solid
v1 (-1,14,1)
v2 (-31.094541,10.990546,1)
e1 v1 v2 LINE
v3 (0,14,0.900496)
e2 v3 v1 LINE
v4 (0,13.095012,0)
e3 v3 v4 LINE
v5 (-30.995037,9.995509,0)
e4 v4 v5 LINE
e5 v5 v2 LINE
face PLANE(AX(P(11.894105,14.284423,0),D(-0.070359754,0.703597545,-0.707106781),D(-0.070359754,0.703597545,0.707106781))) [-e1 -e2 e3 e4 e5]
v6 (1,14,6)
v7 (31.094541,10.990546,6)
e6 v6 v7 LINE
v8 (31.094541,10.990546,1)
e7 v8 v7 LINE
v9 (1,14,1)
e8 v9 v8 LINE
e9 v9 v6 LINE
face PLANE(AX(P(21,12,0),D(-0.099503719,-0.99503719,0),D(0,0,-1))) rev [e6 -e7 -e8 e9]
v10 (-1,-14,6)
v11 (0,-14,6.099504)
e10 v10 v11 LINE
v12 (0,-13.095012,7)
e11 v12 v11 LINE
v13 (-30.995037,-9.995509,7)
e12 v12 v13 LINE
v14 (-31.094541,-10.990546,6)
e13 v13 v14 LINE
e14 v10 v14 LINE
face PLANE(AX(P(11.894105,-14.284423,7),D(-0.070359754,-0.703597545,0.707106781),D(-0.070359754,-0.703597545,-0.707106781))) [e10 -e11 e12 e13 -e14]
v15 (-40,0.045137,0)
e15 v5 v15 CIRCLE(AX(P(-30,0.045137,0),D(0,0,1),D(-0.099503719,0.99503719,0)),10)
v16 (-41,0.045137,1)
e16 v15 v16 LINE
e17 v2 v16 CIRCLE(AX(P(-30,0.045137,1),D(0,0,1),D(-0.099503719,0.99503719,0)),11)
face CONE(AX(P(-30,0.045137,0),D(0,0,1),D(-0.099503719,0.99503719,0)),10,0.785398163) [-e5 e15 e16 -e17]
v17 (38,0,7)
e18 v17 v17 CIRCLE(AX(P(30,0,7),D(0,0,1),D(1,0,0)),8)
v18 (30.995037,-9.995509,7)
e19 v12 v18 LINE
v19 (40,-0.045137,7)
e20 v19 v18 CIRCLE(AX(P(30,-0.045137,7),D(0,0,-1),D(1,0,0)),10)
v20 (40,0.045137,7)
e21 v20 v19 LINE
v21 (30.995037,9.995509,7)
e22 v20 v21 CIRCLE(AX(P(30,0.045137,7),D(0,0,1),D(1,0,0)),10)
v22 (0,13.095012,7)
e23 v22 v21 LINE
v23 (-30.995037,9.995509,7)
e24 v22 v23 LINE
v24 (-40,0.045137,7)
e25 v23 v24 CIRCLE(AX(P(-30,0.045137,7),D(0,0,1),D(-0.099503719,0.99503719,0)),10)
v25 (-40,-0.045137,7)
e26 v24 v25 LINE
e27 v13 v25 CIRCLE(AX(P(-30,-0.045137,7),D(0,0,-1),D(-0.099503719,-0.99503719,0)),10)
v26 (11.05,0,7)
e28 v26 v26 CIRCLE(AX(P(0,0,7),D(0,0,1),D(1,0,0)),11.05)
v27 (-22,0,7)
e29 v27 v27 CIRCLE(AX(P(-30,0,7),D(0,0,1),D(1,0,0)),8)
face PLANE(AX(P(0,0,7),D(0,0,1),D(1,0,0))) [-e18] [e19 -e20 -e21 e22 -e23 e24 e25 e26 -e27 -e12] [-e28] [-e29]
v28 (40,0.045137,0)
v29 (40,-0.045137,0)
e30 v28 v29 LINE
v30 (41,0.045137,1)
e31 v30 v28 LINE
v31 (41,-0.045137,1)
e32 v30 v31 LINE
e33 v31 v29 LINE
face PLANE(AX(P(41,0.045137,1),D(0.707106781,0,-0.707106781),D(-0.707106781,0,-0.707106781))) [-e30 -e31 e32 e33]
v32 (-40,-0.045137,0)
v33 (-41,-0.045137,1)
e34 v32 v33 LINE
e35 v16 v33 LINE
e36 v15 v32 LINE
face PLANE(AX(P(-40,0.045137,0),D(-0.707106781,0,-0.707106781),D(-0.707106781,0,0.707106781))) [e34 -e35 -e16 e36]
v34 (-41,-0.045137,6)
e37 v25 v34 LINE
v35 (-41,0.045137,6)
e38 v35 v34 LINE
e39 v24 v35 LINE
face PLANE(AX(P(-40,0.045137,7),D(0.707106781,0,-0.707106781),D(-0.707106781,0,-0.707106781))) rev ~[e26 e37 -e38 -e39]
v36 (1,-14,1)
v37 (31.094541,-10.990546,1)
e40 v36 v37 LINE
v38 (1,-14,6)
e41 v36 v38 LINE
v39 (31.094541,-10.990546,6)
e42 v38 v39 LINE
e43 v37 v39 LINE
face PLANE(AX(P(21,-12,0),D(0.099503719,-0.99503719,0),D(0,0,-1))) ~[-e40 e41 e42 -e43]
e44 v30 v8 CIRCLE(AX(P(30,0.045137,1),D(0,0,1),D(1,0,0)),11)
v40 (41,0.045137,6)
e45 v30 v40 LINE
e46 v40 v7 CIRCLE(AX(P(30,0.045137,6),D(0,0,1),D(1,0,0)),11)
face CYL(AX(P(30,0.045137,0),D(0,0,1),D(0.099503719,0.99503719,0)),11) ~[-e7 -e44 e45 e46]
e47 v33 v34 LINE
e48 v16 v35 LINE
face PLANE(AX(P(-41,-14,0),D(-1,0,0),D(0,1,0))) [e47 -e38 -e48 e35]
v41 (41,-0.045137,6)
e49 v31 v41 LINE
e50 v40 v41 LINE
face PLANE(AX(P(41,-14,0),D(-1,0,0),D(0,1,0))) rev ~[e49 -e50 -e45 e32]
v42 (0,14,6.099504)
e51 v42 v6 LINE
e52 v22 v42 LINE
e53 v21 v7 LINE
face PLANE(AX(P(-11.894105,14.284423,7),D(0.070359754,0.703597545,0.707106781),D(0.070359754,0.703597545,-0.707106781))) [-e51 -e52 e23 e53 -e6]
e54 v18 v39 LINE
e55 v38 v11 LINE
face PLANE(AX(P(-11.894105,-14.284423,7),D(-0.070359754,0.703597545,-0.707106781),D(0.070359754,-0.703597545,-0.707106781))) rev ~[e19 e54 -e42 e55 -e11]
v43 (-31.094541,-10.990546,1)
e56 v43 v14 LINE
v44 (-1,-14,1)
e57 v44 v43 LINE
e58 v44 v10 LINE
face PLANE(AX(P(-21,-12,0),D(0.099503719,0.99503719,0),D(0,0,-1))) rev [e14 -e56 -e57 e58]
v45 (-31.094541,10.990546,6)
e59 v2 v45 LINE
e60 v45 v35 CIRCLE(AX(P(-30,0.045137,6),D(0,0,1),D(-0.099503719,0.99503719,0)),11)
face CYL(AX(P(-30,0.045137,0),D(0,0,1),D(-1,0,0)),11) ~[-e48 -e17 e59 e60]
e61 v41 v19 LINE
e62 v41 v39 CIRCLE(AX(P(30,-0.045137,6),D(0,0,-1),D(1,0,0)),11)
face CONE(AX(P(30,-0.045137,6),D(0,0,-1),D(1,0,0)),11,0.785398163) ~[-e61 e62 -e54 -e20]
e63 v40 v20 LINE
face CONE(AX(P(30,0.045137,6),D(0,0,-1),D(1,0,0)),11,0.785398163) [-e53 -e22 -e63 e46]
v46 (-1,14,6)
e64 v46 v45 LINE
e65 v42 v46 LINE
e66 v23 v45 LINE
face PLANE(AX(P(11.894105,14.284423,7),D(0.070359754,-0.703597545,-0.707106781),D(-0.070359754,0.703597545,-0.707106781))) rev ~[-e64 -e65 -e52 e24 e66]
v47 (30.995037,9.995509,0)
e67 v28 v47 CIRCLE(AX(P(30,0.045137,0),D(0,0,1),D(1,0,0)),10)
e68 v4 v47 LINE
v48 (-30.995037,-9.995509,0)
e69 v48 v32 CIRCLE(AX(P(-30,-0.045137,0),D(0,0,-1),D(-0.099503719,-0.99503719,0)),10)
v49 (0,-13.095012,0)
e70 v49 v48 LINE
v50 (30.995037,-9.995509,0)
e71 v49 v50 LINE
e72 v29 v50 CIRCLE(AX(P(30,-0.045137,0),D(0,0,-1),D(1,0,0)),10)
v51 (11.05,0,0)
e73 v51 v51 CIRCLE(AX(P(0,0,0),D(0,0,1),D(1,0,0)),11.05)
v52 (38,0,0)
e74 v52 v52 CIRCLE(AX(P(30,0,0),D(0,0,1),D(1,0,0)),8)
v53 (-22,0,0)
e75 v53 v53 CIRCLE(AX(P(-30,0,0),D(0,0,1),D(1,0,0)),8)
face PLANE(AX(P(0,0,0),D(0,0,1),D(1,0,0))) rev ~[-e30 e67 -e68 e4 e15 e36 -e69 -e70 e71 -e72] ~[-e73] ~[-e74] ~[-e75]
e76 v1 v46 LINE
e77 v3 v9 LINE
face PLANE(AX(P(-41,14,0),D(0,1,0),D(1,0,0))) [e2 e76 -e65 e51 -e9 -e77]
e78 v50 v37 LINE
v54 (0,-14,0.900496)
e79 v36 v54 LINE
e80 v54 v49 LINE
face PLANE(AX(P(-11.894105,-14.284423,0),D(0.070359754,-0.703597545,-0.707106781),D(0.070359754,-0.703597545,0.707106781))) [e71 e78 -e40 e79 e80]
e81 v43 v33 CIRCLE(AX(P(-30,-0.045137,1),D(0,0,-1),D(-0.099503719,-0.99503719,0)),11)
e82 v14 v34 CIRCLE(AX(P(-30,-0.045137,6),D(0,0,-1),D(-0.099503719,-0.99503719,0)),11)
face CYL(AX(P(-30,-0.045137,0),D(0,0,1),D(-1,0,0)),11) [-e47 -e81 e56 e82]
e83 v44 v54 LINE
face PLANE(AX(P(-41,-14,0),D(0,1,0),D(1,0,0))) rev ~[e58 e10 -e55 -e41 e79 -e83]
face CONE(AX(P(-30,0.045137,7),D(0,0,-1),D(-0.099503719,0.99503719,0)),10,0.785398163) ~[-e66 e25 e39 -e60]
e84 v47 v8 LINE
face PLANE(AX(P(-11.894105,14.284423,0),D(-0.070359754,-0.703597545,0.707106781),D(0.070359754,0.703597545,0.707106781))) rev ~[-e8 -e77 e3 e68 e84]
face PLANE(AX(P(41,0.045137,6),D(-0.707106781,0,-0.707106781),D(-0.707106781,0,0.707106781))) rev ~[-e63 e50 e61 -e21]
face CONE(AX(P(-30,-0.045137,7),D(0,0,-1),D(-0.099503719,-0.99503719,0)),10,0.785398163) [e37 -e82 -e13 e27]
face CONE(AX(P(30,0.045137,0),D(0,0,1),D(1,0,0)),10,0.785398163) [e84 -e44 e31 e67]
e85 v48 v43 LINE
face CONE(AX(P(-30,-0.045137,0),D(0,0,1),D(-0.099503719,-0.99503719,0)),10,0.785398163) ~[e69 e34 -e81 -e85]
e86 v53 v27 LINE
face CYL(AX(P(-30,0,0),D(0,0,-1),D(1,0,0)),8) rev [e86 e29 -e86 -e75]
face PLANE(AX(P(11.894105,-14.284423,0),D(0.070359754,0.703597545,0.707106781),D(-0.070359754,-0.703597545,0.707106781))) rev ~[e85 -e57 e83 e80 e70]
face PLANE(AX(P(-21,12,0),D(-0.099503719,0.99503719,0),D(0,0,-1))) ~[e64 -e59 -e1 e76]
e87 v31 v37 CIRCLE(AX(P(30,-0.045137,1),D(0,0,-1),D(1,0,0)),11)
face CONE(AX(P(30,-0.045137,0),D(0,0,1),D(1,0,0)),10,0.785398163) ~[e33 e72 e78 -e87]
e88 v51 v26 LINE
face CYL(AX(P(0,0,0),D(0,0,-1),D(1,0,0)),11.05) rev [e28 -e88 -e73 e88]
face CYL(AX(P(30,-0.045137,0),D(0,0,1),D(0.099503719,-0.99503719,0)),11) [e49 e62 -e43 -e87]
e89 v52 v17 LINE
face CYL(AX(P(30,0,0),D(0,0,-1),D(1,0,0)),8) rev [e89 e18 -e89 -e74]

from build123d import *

# Parameters (mm, degrees)
F0_W         = 82
F0_H         = 28
F0_R         = 8
F0_R_2       = 11.05
F1_DEPTH     = 7
F2_SIZE2     = 4
F2_SIZE      = 40
F2_2_SIZE2   = 4
F2_2_SIZE    = 40
F3_R         = 11
F4_T1_DEPTH  = 43.1030542411
F4_T3_DEPTH  = 43.1030542411
F4_T5_DEPTH  = 43.1030542411
F4_T7_DEPTH  = 43.1030542411
F4_T9_DEPTH  = 0.0902736335
F4_T12_ANGLE = 84.2894068625
F4_T14_ANGLE = 84.2894068625
F4_T16_ANGLE = 84.2894068625
F4_T18_ANGLE = 84.2894068625
F4_T20_ANGLE = 84.2894068625
F4_T22_ANGLE = 84.2894068625
F4_T24_ANGLE = 84.2894068625
F4_T26_ANGLE = 84.2894068625


# Not quite as in the source:
# - a fillet or chamfer that OpenCascade refuses, or shapes differently, is made with other operations: its cross-section is extruded or revolved along the edge and cut away or added


with BuildPart() as f1:
    # F0 (on Top) → F1 (new body)
    with BuildSketch(Plane.XY):
        Rectangle(F0_W, F0_H)
        with Locations((-30, 0)):
            Circle(F0_R, mode=Mode.SUBTRACT)
        Circle(F0_R_2, mode=Mode.SUBTRACT)
        with Locations((30, 0)):
            Circle(F0_R, mode=Mode.SUBTRACT)
    extrude(amount=F1_DEPTH)

    # F2
    f2_edges = [f1.edges().sort_by_distance(p)[0] for p in [
        (-41, -14, 3.5),
        (41, -14, 3.5),
    ]]
    f2_side = f1.faces().sort_by_distance((0, -14, 3.5))[0]
    chamfer(f2_edges, length=F2_SIZE, length2=F2_SIZE2, reference=f2_side)

    # F2#2
    f2_2_edges = [f1.edges().sort_by_distance(p)[0] for p in [
        (41, 14, 3.5),
        (-41, 14, 3.5),
    ]]
    f2_2_side = f1.faces().sort_by_distance((0, 14, 3.5))[0]
    chamfer(f2_2_edges, length=F2_2_SIZE, length2=F2_2_SIZE2, reference=f2_2_side)

    # F3
    f3_edges = [f1.edges().sort_by_distance(p)[0] for p in [
        (-41, 10, 3.5),
        (-41, -10, 3.5),
        (41, 10, 3.5),
        (41, -10, 3.5),
    ]]
    fillet(f3_edges, radius=F3_R)

    # F4: chamfer of 1 on 20 edges, made by hand

    # F4_s2 → F4_t1 (cut)
    with BuildSketch(Plane(origin=(13.1906406762, -1.3190640676, 0), x_dir=(0, 0, 1), z_dir=(-0.9950371902, 0.099503719, 0))):
        Polygon((7, -13.030024382), (6, -14.030024382), (7, -14.030024382), align=None)
        Polygon((0, -13.030024382), (1, -14.030024382), (0, -14.030024382), align=None)
    extrude(amount=F4_T1_DEPTH, mode=Mode.SUBTRACT)

    # F4_s4 → F4_t3 (cut)
    with BuildSketch(Plane(origin=(-13.1906406762, -1.3190640676, 0), x_dir=(0, 0, 1), z_dir=(0.9950371902, 0.099503719, 0))):
        Polygon((7, 13.030024382), (6, 14.030024382), (7, 14.030024382), align=None)
        Polygon((0, 13.030024382), (1, 14.030024382), (0, 14.030024382), align=None)
    extrude(amount=F4_T3_DEPTH, mode=Mode.SUBTRACT)

    # F4_s6 → F4_t5 (cut)
    with BuildSketch(Plane(origin=(-13.1906406762, 1.3190640676, 0), x_dir=(0, 0, 1), z_dir=(0.9950371902, -0.099503719, 0))):
        Polygon((7, -13.030024382), (6, -14.030024382), (7, -14.030024382), align=None)
        Polygon((0, -13.030024382), (1, -14.030024382), (0, -14.030024382), align=None)
    extrude(amount=F4_T5_DEPTH, mode=Mode.SUBTRACT)

    # F4_s8 → F4_t7 (cut)
    with BuildSketch(Plane(origin=(13.1906406762, 1.3190640676, 0), x_dir=(0, 0, 1), z_dir=(-0.9950371902, -0.099503719, 0))):
        Polygon((7, 13.030024382), (6, 14.030024382), (7, 14.030024382), align=None)
        Polygon((0, 13.030024382), (1, 14.030024382), (0, 14.030024382), align=None)
    extrude(amount=F4_T7_DEPTH, mode=Mode.SUBTRACT)

    # F4_s10 → F4_t9 (cut)
    with BuildSketch(Plane.XZ.offset(-0.0451368168)):
        Polygon((41, 1), (40, 0), (41, 0), align=None)
        Polygon((41, 6), (40, 7), (41, 7), align=None)
        Polygon((-40, 0), (-41, 1), (-41, 0), align=None)
        Polygon((-40, 7), (-41, 6), (-41, 7), align=None)
    extrude(amount=F4_T9_DEPTH, mode=Mode.SUBTRACT)

    # F4_s11 → F4_t12 (revolve, cut)
    with BuildSketch(Plane.XZ.offset(0.0451368168)):
        Polygon((40, 0), (41, 1), (41, 0), align=None)
    revolve(axis=Axis((30, -0.0451368168, 0), (0, 0, -1)), revolution_arc=F4_T12_ANGLE, mode=Mode.SUBTRACT)

    # F4_s13 → F4_t14 (revolve, cut)
    with BuildSketch(Plane.XZ.offset(-0.0451368168)):
        Polygon((40, 0), (41, 1), (41, 0), align=None)
    revolve(axis=Axis((30, 0.0451368168, 0), (0, 0, 1)), revolution_arc=F4_T14_ANGLE, mode=Mode.SUBTRACT)

    # F4_s15 → F4_t16 (revolve, cut)
    with BuildSketch(Plane(origin=(-29.6985013053, 2.9698501305, 0), x_dir=(0, 0, 1), z_dir=(0.9950371902, -0.099503719, 0))):
        Polygon((0, 13.030024382), (1, 14.030024382), (0, 14.030024382), align=None)
    revolve(axis=Axis((-30, -0.0451368168, 0), (0, 0, -1)), revolution_arc=F4_T16_ANGLE, mode=Mode.SUBTRACT)

    # F4_s17 → F4_t18 (revolve, cut)
    with BuildSketch(Plane(origin=(-29.6985013053, -2.9698501305, 0), x_dir=(0, 0, 1), z_dir=(0.9950371902, 0.099503719, 0))):
        Polygon((0, -13.030024382), (1, -14.030024382), (0, -14.030024382), align=None)
    revolve(axis=Axis((-30, 0.0451368168, 0), (0, 0, 1)), revolution_arc=F4_T18_ANGLE, mode=Mode.SUBTRACT)

    # F4_s19 → F4_t20 (revolve, cut)
    with BuildSketch(Plane.XZ.offset(0.0451368168)):
        Polygon((41, 6), (40, 7), (41, 7), align=None)
    revolve(axis=Axis((30, -0.0451368168, 7), (0, 0, -1)), revolution_arc=F4_T20_ANGLE, mode=Mode.SUBTRACT)

    # F4_s21 → F4_t22 (revolve, cut)
    with BuildSketch(Plane.XZ.offset(-0.0451368168)):
        Polygon((41, 6), (40, 7), (41, 7), align=None)
    revolve(axis=Axis((30, 0.0451368168, 7), (0, 0, 1)), revolution_arc=F4_T22_ANGLE, mode=Mode.SUBTRACT)

    # F4_s23 → F4_t24 (revolve, cut)
    with BuildSketch(Plane(origin=(-29.6985013053, 2.9698501305, 0), x_dir=(0, 0, 1), z_dir=(0.9950371902, -0.099503719, 0))):
        Polygon((7, 13.030024382), (6, 14.030024382), (7, 14.030024382), align=None)
    revolve(axis=Axis((-30, -0.0451368168, 7), (0, 0, -1)), revolution_arc=F4_T24_ANGLE, mode=Mode.SUBTRACT)

    # F4_s25 → F4_t26 (revolve, cut)
    with BuildSketch(Plane(origin=(-29.6985013053, -2.9698501305, 0), x_dir=(0, 0, 1), z_dir=(0.9950371902, 0.099503719, 0))):
        Polygon((7, -13.030024382), (6, -14.030024382), (7, -14.030024382), align=None)
    revolve(axis=Axis((-30, 0.0451368168, 7), (0, 0, 1)), revolution_arc=F4_T26_ANGLE, mode=Mode.SUBTRACT)


solid = f1.part
